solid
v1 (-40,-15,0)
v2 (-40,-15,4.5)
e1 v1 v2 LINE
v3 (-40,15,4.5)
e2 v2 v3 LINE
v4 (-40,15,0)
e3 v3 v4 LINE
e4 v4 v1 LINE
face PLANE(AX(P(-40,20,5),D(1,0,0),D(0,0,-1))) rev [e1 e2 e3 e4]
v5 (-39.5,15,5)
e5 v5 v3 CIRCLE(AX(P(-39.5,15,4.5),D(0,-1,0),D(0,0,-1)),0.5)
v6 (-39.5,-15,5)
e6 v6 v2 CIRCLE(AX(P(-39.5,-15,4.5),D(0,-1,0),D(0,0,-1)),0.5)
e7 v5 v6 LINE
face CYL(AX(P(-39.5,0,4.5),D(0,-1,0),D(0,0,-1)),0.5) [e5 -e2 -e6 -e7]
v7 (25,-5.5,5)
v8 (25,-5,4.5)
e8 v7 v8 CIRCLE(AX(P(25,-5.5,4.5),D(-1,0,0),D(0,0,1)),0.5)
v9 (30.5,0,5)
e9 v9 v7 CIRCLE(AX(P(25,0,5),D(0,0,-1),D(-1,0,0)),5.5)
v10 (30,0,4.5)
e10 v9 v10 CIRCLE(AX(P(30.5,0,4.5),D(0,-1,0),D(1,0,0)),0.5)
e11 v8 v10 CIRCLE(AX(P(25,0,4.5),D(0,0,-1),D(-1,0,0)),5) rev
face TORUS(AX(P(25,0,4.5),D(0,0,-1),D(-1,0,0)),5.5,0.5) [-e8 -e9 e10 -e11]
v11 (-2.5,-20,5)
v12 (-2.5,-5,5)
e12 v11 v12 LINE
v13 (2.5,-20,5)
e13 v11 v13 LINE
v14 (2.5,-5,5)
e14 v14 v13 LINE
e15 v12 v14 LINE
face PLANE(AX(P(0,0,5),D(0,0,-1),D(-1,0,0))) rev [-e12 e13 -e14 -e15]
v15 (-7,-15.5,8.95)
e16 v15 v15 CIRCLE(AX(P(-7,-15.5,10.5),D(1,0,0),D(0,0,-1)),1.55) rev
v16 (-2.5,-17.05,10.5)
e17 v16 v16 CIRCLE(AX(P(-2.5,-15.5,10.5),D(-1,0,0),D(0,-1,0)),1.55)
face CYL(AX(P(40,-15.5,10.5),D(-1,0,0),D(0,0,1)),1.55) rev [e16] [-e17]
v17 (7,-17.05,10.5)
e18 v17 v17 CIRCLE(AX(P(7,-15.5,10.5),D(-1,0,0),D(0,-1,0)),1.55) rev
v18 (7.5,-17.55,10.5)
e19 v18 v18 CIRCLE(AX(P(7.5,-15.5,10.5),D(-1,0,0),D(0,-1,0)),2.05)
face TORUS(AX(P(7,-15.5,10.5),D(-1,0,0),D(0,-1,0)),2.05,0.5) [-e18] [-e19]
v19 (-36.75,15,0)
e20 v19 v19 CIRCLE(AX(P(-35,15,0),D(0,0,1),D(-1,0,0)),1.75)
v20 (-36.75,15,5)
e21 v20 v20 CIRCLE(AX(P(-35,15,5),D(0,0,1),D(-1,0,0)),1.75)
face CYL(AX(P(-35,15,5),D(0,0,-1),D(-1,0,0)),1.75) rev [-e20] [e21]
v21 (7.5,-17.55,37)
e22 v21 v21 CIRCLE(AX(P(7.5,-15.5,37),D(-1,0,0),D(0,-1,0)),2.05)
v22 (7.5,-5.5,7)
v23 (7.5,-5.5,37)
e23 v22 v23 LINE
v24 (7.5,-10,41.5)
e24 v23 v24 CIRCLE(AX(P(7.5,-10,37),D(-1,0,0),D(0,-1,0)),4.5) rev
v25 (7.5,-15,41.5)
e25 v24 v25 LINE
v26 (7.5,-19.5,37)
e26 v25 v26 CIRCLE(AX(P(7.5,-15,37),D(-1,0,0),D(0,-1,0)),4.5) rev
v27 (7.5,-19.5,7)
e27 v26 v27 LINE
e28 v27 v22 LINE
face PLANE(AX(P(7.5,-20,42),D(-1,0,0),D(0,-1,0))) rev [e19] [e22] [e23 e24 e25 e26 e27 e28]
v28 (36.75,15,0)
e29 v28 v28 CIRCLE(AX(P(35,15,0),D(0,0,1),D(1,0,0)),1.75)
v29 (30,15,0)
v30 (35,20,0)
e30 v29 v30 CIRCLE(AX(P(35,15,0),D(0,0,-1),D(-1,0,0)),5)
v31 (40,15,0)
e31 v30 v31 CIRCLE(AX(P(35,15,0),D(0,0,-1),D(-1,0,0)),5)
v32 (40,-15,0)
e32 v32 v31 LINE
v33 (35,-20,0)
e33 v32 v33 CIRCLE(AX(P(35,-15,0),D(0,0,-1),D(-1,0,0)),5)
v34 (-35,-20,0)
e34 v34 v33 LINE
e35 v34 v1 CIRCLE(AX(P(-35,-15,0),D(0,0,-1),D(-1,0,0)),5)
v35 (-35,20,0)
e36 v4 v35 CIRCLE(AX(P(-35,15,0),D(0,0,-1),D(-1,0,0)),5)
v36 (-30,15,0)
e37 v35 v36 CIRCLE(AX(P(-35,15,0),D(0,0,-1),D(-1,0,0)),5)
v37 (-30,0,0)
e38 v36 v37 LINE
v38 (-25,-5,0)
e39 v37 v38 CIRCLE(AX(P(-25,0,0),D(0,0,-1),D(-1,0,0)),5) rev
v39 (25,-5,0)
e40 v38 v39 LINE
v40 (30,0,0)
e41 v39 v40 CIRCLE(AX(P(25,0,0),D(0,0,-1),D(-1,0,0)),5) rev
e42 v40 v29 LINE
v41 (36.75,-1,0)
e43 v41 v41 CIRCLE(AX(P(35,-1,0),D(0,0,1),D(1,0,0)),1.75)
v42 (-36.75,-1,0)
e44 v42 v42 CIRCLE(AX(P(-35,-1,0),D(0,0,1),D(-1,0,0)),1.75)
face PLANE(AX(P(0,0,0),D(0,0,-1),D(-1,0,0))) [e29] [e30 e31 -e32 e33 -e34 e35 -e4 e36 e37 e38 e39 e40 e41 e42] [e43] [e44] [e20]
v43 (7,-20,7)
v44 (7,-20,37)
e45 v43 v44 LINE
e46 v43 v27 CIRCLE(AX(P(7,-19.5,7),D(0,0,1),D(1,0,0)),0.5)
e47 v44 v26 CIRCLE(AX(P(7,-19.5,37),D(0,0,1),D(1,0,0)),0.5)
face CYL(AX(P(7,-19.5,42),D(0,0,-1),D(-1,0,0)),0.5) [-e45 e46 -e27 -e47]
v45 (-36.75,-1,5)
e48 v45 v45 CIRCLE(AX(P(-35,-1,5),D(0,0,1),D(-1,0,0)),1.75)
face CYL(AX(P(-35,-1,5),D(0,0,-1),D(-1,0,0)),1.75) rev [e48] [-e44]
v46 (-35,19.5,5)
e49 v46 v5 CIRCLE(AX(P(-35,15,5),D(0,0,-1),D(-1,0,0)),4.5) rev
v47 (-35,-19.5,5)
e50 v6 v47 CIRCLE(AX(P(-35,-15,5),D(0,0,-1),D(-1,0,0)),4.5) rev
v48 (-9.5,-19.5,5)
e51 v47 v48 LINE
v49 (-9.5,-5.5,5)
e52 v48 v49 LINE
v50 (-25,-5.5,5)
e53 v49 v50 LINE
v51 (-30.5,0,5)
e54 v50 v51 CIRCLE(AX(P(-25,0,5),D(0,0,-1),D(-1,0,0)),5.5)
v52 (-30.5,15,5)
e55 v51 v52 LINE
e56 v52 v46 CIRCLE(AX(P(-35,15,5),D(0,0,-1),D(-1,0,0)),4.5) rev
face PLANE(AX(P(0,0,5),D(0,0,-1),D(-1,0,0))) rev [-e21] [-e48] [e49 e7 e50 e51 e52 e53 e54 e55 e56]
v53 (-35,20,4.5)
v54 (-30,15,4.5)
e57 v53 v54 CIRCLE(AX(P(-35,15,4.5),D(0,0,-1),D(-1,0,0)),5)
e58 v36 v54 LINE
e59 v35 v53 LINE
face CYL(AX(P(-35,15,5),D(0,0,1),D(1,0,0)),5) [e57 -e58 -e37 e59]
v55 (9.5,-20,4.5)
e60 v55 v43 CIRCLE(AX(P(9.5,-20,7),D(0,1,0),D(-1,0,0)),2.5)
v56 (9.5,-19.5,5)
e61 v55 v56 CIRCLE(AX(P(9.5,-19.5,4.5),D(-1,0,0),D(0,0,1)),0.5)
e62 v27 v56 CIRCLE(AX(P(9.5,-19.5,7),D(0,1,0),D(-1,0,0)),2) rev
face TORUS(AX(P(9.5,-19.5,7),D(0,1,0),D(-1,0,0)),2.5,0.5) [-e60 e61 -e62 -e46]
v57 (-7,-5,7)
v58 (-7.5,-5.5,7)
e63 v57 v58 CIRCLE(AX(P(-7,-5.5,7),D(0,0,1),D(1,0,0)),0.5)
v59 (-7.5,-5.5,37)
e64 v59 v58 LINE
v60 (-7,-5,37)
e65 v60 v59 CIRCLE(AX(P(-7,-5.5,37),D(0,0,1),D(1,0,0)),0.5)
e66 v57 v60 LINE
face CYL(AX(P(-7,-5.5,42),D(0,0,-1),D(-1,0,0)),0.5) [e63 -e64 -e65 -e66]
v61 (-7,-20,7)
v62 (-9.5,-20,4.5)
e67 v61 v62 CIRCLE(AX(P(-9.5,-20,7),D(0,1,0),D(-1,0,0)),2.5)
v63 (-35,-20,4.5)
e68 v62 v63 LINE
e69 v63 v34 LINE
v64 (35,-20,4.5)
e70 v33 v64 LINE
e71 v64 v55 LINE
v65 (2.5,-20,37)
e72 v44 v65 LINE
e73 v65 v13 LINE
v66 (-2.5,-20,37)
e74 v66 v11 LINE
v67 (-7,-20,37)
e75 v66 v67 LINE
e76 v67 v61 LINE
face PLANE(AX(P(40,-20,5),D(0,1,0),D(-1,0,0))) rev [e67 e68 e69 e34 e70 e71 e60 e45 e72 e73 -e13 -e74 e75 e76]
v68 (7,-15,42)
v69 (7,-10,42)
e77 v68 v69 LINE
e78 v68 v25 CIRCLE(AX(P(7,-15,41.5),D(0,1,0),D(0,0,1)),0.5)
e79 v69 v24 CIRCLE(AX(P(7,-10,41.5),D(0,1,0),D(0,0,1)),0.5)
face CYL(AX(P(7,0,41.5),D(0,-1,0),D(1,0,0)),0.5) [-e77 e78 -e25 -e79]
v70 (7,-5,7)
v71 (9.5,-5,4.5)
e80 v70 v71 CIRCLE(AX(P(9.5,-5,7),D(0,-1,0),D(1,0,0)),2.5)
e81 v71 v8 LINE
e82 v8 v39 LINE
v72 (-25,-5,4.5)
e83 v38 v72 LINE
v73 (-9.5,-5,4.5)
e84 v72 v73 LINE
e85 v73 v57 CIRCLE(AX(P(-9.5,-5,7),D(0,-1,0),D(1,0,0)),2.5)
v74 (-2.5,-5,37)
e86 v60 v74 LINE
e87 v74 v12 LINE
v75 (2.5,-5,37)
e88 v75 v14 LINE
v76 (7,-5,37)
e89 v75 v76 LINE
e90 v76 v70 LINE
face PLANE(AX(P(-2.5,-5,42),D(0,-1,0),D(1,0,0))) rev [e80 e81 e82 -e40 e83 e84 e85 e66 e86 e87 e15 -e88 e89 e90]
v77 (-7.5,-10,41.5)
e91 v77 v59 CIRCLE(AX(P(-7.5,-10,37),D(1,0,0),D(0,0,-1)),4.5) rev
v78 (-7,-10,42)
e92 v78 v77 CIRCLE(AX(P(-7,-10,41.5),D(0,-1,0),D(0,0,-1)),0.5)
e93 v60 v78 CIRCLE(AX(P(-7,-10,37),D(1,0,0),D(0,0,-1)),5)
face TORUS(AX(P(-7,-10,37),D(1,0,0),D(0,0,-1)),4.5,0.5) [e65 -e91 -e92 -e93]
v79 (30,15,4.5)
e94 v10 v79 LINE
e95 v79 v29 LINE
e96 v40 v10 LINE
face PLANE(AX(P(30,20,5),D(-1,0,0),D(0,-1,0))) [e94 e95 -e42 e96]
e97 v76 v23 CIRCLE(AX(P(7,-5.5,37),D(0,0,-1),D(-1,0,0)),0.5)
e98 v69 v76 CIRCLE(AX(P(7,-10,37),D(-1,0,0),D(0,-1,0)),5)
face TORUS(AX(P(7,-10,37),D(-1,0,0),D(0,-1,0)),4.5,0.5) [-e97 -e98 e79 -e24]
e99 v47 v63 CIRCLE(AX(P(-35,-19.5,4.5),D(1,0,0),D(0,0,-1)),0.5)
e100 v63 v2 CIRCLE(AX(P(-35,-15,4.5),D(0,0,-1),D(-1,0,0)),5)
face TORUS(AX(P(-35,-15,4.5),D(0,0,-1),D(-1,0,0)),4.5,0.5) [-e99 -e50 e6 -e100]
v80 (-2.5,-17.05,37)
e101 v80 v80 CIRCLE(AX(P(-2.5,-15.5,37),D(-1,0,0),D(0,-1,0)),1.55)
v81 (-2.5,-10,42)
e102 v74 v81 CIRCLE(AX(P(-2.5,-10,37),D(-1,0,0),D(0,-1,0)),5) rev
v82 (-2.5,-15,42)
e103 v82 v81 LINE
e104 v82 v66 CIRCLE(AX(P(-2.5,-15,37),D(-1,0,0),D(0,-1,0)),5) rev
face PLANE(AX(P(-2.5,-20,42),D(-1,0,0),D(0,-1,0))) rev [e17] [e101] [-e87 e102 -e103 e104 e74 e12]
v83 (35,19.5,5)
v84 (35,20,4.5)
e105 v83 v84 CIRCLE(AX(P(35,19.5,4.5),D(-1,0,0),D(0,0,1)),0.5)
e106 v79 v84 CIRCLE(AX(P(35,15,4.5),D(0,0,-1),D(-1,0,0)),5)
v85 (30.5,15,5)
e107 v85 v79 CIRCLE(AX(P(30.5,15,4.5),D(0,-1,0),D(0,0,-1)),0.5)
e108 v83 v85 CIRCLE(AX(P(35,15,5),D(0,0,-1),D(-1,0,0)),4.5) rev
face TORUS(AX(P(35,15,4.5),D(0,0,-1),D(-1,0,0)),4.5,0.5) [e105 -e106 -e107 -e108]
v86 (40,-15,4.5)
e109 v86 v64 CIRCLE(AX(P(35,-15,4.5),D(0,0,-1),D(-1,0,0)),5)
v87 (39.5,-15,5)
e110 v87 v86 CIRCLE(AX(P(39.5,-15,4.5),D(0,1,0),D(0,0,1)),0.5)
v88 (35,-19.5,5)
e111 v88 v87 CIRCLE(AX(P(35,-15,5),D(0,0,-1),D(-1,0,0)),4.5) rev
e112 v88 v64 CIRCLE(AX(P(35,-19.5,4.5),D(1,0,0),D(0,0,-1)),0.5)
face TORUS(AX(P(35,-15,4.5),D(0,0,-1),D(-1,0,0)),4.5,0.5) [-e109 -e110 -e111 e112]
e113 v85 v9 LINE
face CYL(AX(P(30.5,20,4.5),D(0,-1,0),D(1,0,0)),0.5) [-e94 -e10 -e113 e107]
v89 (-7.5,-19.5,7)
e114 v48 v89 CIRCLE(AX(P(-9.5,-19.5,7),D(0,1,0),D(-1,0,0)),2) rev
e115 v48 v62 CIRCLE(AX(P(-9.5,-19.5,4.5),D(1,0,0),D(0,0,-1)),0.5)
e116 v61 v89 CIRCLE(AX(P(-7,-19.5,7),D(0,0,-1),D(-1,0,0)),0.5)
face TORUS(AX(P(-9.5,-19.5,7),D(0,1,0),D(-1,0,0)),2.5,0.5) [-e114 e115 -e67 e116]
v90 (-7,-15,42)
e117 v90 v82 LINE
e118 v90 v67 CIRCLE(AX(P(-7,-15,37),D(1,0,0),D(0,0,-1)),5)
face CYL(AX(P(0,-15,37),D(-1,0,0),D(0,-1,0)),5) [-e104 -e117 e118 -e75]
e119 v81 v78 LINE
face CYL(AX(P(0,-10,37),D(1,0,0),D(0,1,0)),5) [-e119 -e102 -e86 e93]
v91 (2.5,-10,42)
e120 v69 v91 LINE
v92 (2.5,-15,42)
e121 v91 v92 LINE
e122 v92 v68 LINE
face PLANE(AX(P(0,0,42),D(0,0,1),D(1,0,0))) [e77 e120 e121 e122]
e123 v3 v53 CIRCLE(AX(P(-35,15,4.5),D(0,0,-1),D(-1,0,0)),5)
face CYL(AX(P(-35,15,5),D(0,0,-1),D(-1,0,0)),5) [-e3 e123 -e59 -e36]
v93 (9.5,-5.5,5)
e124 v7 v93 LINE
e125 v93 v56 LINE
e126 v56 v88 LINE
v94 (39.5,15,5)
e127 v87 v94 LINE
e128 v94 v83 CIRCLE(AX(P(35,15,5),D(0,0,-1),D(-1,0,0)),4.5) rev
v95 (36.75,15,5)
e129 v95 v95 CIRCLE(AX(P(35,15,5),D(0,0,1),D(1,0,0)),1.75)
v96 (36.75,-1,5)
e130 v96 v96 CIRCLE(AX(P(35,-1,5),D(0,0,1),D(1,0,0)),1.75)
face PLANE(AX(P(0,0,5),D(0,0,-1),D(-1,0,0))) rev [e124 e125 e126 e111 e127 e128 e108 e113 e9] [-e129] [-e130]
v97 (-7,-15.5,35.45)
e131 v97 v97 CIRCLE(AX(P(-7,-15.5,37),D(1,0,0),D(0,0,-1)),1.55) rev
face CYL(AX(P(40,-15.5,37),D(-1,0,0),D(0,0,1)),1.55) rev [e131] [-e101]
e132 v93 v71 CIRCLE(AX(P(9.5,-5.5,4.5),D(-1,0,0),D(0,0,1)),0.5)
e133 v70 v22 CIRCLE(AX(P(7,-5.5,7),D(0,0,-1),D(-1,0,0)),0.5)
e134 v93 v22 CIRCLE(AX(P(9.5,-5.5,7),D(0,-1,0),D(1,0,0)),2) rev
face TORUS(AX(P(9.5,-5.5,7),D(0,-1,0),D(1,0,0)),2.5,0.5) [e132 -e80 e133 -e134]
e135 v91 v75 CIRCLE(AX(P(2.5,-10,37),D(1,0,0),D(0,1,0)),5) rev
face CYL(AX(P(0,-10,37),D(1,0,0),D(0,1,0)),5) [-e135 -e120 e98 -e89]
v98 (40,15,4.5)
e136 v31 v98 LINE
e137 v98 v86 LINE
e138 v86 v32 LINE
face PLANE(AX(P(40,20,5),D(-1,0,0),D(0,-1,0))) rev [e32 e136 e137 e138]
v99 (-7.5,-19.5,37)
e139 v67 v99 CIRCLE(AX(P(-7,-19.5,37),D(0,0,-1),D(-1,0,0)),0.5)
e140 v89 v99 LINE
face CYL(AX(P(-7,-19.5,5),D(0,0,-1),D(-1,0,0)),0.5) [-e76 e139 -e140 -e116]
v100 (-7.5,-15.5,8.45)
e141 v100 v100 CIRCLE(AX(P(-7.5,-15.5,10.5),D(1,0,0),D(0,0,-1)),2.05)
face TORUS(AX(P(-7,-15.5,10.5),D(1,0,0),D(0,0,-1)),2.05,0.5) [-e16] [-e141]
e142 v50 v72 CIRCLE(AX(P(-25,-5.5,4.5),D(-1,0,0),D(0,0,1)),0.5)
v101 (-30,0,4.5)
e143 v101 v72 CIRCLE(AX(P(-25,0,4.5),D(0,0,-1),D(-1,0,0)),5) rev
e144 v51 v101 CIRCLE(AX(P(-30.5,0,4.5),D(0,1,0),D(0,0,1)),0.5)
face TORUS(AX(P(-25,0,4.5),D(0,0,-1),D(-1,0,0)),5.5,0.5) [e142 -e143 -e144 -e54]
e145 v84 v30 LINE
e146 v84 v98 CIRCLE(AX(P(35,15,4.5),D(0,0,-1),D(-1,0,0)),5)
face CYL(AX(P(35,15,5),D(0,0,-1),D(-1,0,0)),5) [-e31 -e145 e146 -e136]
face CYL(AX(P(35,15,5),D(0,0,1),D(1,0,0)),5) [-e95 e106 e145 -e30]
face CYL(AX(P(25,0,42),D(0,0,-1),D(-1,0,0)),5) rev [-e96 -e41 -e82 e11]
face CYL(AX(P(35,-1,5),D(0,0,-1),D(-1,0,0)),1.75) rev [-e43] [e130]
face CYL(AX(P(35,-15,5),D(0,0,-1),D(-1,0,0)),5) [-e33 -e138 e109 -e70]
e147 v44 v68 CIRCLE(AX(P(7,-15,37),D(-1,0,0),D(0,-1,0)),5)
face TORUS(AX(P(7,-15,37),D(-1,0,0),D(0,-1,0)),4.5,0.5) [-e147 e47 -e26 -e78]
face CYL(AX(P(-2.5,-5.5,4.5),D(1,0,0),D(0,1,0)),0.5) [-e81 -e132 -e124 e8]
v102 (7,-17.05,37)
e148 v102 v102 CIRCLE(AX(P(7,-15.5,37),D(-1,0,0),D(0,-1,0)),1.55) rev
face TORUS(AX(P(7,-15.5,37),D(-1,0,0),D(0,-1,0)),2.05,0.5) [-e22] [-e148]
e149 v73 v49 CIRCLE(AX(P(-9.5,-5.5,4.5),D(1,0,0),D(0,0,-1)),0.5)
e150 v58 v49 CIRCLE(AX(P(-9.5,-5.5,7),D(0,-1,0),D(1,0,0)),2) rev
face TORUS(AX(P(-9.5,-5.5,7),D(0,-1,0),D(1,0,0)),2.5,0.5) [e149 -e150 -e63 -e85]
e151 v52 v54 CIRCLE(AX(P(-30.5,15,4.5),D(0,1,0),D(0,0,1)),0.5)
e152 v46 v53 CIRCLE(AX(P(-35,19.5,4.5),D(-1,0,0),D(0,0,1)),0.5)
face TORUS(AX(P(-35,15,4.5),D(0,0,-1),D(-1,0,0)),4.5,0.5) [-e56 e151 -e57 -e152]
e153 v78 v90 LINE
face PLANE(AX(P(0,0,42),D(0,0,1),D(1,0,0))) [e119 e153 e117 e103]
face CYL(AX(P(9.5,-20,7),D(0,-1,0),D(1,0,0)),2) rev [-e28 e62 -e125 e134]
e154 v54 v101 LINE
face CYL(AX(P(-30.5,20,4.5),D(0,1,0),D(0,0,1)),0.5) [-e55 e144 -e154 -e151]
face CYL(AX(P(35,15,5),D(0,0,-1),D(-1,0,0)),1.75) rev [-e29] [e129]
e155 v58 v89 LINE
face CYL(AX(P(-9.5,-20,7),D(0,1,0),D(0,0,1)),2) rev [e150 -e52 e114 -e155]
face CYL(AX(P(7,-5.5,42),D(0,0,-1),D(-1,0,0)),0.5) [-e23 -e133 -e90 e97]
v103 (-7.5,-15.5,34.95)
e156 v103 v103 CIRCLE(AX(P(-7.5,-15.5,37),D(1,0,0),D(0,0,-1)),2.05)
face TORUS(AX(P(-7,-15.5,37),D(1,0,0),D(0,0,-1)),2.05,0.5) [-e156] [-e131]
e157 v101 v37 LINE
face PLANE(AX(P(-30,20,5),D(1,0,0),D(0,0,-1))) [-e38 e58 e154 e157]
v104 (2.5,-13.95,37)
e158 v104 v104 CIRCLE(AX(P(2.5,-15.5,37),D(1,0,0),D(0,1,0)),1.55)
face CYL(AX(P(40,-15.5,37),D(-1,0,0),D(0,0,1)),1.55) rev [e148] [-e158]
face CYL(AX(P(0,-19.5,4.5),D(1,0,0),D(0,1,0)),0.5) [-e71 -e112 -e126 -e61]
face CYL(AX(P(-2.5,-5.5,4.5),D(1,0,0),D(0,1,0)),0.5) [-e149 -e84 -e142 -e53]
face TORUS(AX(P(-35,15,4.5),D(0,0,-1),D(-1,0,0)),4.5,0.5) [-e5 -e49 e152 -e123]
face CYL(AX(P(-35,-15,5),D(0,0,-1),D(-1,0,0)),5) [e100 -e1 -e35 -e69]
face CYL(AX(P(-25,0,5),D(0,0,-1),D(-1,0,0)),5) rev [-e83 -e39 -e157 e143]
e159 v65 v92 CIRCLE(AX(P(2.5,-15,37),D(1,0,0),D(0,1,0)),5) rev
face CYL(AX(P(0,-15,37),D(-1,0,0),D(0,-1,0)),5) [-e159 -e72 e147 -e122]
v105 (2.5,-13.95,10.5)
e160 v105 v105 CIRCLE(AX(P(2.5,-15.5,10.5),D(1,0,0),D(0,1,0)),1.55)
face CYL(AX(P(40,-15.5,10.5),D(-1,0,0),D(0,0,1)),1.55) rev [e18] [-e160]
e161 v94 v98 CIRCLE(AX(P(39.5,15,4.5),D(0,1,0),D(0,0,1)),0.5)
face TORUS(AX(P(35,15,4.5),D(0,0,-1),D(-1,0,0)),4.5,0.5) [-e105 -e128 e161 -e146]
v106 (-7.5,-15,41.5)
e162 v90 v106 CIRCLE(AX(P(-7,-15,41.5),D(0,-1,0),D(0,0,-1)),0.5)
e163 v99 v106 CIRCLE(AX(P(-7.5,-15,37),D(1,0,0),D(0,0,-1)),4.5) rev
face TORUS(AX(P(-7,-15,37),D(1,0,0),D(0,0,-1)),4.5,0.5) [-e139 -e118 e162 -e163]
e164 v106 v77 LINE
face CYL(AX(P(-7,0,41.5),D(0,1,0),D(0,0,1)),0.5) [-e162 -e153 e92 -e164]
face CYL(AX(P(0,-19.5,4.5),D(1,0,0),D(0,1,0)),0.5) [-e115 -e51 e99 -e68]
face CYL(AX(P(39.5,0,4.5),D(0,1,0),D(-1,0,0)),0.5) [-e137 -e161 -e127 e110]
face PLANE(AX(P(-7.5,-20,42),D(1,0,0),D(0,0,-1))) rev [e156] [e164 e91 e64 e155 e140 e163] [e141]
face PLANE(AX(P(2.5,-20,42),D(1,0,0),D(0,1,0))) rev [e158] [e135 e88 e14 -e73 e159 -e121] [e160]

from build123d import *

# Parameters (mm, degrees)
SKETCH_1_W          = 80
SKETCH_1_H          = 40
EXTRUDE_1_DEPTH     = 5
SKETCH_2_R          = 1.75
CUT_EXTRUDE_1_DEPTH = 46
SKETCH_3_W          = 5
SKETCH_3_H          = 15
EXTRUDE_2_DEPTH     = 37
SKETCH_4_R          = 1.55
CUT_EXTRUDE_2_DEPTH = 67.484960705
SKETCH_5_W          = 60
SKETCH_5_H          = 25
CUT_EXTRUDE_3_DEPTH = 5
FILLET_1_R          = 5
FILLET_2_R          = 5
FILLET_3_R          = 2
FILLET_4_R          = 0.5


with BuildPart() as part:
    # ｽｹｯﾁ1 → ﾎﾞｽ - 押し出し1 (new body)
    with BuildSketch(Plane.XY):
        Rectangle(SKETCH_1_W, SKETCH_1_H)
    extrude(amount=EXTRUDE_1_DEPTH)

    # ｽｹｯﾁ2 → ｶｯﾄ - 押し出し1 (cut, through all)
    with BuildSketch(Plane.XY):
        with Locations((35, 15)):
            Circle(SKETCH_2_R)
        with Locations((35, -1)):
            Circle(SKETCH_2_R)
        with Locations(Location((-35, 15, 0), (0, 0, 180))):
            Circle(SKETCH_2_R)
        with Locations(Location((-35, -1, 0), (0, 0, 180))):
            Circle(SKETCH_2_R)
    extrude(amount=CUT_EXTRUDE_1_DEPTH, mode=Mode.SUBTRACT)

    # ｽｹｯﾁ3 → ﾎﾞｽ - 押し出し2 (add)
    with BuildSketch(Plane.XY.offset(5)):
        with Locations((5, -12.5)):
            Rectangle(SKETCH_3_W, SKETCH_3_H)
        with Locations((-5, -12.5)):
            Rectangle(SKETCH_3_W, SKETCH_3_H)
    extrude(amount=EXTRUDE_2_DEPTH)

    # ｽｹｯﾁ4 → ｶｯﾄ - 押し出し2 (cut, through all)
    with BuildSketch(Plane.ZY.offset(7.5)):
        with Locations(Location((10.5, -15.5, 0), (0, 0, 90))):
            Circle(SKETCH_4_R)
        with Locations(Location((37, -15.5, 0), (0, 0, 90))):
            Circle(SKETCH_4_R)
    extrude(amount=-CUT_EXTRUDE_2_DEPTH, mode=Mode.SUBTRACT)

    # ｽｹｯﾁ5 → ｶｯﾄ - 押し出し3 (cut)
    with BuildSketch(Plane.XY):
        with Locations((0, 7.5)):
            Rectangle(SKETCH_5_W, SKETCH_5_H)
    extrude(amount=CUT_EXTRUDE_3_DEPTH, mode=Mode.SUBTRACT)

    # ﾌｨﾚｯﾄ1
    fillet_1_edges = [part.edges().sort_by_distance(p)[0] for p in [
        (5, -5, 42),
        (-5, -5, 42),
        (5, -20, 42),
        (-5, -20, 42),
    ]]
    fillet(fillet_1_edges, radius=FILLET_1_R)

    # ﾌｨﾚｯﾄ2
    fillet_2_edges = [part.edges().sort_by_distance(p)[0] for p in [
        (-30, -5, 2.5),
        (30, -5, 2.5),
        (30, 20, 2.5),
        (40, 20, 2.5),
        (40, -20, 2.5),
        (-40, -20, 2.5),
        (-30, 20, 2.5),
        (-40, 20, 2.5),
    ]]
    fillet(fillet_2_edges, radius=FILLET_2_R - 0.0001)  # a hair under: the kernel refuses the full size

    # ﾌｨﾚｯﾄ3
    fillet_3_edges = [part.edges().sort_by_distance(p)[0] for p in [
        (7.5, -12.5, 5),
        (-7.5, -12.5, 5),
    ]]
    fillet(fillet_3_edges, radius=FILLET_3_R)

    # ﾌｨﾚｯﾄ4
    fillet_4_edges = [part.edges().sort_by_distance(p)[0] for p in [
        (-7.5, -12.5, 42),
        (-7.5, -20, 22),
        (-7.5, -18.535533906, 40.535533906),
        (-7.5, -6.464466094, 40.535533906),
        (-30, 7.5, 5),
        (-17.25005, -5, 5),
        (30, 7.5, 5),
        (40, 0, 5),
        (38.535563195, -18.535563195, 5),
        (38.535563195, 18.535563195, 5),
        (31.464436805, 18.535563195, 5),
        (-22.25005, -20, 5),
        (-40, 0, 5),
        (-38.535563195, 18.535563195, 5),
        (-31.464436805, 18.535563195, 5),
        (-38.535563195, -18.535563195, 5),
        (-28.535563195, -3.535563195, 5),
        (28.535563195, -3.535563195, 5),
        (17.25005, -5, 5),
        (22.25005, -20, 5),
        (8.085786438, -5, 5.585786438),
        (8.085786438, -20, 5.585786438),
        (-8.085786438, -20, 5.585786438),
        (-8.085786438, -5, 5.585786438),
        (7.5, -17.05, 10.5),
        (-7.5, -17.05, 10.5),
        (7.5, -17.05, 37),
        (-7.5, -17.05, 37),
        (7.5, -12.5, 42),
        (7.5, -5, 22),
        (-7.5, -5, 22),
        (7.5, -20, 22),
        (7.5, -18.535533906, 40.535533906),
        (7.5, -6.464466094, 40.535533906),
    ]]
    fillet(fillet_4_edges, radius=FILLET_4_R)


solid = part.part
